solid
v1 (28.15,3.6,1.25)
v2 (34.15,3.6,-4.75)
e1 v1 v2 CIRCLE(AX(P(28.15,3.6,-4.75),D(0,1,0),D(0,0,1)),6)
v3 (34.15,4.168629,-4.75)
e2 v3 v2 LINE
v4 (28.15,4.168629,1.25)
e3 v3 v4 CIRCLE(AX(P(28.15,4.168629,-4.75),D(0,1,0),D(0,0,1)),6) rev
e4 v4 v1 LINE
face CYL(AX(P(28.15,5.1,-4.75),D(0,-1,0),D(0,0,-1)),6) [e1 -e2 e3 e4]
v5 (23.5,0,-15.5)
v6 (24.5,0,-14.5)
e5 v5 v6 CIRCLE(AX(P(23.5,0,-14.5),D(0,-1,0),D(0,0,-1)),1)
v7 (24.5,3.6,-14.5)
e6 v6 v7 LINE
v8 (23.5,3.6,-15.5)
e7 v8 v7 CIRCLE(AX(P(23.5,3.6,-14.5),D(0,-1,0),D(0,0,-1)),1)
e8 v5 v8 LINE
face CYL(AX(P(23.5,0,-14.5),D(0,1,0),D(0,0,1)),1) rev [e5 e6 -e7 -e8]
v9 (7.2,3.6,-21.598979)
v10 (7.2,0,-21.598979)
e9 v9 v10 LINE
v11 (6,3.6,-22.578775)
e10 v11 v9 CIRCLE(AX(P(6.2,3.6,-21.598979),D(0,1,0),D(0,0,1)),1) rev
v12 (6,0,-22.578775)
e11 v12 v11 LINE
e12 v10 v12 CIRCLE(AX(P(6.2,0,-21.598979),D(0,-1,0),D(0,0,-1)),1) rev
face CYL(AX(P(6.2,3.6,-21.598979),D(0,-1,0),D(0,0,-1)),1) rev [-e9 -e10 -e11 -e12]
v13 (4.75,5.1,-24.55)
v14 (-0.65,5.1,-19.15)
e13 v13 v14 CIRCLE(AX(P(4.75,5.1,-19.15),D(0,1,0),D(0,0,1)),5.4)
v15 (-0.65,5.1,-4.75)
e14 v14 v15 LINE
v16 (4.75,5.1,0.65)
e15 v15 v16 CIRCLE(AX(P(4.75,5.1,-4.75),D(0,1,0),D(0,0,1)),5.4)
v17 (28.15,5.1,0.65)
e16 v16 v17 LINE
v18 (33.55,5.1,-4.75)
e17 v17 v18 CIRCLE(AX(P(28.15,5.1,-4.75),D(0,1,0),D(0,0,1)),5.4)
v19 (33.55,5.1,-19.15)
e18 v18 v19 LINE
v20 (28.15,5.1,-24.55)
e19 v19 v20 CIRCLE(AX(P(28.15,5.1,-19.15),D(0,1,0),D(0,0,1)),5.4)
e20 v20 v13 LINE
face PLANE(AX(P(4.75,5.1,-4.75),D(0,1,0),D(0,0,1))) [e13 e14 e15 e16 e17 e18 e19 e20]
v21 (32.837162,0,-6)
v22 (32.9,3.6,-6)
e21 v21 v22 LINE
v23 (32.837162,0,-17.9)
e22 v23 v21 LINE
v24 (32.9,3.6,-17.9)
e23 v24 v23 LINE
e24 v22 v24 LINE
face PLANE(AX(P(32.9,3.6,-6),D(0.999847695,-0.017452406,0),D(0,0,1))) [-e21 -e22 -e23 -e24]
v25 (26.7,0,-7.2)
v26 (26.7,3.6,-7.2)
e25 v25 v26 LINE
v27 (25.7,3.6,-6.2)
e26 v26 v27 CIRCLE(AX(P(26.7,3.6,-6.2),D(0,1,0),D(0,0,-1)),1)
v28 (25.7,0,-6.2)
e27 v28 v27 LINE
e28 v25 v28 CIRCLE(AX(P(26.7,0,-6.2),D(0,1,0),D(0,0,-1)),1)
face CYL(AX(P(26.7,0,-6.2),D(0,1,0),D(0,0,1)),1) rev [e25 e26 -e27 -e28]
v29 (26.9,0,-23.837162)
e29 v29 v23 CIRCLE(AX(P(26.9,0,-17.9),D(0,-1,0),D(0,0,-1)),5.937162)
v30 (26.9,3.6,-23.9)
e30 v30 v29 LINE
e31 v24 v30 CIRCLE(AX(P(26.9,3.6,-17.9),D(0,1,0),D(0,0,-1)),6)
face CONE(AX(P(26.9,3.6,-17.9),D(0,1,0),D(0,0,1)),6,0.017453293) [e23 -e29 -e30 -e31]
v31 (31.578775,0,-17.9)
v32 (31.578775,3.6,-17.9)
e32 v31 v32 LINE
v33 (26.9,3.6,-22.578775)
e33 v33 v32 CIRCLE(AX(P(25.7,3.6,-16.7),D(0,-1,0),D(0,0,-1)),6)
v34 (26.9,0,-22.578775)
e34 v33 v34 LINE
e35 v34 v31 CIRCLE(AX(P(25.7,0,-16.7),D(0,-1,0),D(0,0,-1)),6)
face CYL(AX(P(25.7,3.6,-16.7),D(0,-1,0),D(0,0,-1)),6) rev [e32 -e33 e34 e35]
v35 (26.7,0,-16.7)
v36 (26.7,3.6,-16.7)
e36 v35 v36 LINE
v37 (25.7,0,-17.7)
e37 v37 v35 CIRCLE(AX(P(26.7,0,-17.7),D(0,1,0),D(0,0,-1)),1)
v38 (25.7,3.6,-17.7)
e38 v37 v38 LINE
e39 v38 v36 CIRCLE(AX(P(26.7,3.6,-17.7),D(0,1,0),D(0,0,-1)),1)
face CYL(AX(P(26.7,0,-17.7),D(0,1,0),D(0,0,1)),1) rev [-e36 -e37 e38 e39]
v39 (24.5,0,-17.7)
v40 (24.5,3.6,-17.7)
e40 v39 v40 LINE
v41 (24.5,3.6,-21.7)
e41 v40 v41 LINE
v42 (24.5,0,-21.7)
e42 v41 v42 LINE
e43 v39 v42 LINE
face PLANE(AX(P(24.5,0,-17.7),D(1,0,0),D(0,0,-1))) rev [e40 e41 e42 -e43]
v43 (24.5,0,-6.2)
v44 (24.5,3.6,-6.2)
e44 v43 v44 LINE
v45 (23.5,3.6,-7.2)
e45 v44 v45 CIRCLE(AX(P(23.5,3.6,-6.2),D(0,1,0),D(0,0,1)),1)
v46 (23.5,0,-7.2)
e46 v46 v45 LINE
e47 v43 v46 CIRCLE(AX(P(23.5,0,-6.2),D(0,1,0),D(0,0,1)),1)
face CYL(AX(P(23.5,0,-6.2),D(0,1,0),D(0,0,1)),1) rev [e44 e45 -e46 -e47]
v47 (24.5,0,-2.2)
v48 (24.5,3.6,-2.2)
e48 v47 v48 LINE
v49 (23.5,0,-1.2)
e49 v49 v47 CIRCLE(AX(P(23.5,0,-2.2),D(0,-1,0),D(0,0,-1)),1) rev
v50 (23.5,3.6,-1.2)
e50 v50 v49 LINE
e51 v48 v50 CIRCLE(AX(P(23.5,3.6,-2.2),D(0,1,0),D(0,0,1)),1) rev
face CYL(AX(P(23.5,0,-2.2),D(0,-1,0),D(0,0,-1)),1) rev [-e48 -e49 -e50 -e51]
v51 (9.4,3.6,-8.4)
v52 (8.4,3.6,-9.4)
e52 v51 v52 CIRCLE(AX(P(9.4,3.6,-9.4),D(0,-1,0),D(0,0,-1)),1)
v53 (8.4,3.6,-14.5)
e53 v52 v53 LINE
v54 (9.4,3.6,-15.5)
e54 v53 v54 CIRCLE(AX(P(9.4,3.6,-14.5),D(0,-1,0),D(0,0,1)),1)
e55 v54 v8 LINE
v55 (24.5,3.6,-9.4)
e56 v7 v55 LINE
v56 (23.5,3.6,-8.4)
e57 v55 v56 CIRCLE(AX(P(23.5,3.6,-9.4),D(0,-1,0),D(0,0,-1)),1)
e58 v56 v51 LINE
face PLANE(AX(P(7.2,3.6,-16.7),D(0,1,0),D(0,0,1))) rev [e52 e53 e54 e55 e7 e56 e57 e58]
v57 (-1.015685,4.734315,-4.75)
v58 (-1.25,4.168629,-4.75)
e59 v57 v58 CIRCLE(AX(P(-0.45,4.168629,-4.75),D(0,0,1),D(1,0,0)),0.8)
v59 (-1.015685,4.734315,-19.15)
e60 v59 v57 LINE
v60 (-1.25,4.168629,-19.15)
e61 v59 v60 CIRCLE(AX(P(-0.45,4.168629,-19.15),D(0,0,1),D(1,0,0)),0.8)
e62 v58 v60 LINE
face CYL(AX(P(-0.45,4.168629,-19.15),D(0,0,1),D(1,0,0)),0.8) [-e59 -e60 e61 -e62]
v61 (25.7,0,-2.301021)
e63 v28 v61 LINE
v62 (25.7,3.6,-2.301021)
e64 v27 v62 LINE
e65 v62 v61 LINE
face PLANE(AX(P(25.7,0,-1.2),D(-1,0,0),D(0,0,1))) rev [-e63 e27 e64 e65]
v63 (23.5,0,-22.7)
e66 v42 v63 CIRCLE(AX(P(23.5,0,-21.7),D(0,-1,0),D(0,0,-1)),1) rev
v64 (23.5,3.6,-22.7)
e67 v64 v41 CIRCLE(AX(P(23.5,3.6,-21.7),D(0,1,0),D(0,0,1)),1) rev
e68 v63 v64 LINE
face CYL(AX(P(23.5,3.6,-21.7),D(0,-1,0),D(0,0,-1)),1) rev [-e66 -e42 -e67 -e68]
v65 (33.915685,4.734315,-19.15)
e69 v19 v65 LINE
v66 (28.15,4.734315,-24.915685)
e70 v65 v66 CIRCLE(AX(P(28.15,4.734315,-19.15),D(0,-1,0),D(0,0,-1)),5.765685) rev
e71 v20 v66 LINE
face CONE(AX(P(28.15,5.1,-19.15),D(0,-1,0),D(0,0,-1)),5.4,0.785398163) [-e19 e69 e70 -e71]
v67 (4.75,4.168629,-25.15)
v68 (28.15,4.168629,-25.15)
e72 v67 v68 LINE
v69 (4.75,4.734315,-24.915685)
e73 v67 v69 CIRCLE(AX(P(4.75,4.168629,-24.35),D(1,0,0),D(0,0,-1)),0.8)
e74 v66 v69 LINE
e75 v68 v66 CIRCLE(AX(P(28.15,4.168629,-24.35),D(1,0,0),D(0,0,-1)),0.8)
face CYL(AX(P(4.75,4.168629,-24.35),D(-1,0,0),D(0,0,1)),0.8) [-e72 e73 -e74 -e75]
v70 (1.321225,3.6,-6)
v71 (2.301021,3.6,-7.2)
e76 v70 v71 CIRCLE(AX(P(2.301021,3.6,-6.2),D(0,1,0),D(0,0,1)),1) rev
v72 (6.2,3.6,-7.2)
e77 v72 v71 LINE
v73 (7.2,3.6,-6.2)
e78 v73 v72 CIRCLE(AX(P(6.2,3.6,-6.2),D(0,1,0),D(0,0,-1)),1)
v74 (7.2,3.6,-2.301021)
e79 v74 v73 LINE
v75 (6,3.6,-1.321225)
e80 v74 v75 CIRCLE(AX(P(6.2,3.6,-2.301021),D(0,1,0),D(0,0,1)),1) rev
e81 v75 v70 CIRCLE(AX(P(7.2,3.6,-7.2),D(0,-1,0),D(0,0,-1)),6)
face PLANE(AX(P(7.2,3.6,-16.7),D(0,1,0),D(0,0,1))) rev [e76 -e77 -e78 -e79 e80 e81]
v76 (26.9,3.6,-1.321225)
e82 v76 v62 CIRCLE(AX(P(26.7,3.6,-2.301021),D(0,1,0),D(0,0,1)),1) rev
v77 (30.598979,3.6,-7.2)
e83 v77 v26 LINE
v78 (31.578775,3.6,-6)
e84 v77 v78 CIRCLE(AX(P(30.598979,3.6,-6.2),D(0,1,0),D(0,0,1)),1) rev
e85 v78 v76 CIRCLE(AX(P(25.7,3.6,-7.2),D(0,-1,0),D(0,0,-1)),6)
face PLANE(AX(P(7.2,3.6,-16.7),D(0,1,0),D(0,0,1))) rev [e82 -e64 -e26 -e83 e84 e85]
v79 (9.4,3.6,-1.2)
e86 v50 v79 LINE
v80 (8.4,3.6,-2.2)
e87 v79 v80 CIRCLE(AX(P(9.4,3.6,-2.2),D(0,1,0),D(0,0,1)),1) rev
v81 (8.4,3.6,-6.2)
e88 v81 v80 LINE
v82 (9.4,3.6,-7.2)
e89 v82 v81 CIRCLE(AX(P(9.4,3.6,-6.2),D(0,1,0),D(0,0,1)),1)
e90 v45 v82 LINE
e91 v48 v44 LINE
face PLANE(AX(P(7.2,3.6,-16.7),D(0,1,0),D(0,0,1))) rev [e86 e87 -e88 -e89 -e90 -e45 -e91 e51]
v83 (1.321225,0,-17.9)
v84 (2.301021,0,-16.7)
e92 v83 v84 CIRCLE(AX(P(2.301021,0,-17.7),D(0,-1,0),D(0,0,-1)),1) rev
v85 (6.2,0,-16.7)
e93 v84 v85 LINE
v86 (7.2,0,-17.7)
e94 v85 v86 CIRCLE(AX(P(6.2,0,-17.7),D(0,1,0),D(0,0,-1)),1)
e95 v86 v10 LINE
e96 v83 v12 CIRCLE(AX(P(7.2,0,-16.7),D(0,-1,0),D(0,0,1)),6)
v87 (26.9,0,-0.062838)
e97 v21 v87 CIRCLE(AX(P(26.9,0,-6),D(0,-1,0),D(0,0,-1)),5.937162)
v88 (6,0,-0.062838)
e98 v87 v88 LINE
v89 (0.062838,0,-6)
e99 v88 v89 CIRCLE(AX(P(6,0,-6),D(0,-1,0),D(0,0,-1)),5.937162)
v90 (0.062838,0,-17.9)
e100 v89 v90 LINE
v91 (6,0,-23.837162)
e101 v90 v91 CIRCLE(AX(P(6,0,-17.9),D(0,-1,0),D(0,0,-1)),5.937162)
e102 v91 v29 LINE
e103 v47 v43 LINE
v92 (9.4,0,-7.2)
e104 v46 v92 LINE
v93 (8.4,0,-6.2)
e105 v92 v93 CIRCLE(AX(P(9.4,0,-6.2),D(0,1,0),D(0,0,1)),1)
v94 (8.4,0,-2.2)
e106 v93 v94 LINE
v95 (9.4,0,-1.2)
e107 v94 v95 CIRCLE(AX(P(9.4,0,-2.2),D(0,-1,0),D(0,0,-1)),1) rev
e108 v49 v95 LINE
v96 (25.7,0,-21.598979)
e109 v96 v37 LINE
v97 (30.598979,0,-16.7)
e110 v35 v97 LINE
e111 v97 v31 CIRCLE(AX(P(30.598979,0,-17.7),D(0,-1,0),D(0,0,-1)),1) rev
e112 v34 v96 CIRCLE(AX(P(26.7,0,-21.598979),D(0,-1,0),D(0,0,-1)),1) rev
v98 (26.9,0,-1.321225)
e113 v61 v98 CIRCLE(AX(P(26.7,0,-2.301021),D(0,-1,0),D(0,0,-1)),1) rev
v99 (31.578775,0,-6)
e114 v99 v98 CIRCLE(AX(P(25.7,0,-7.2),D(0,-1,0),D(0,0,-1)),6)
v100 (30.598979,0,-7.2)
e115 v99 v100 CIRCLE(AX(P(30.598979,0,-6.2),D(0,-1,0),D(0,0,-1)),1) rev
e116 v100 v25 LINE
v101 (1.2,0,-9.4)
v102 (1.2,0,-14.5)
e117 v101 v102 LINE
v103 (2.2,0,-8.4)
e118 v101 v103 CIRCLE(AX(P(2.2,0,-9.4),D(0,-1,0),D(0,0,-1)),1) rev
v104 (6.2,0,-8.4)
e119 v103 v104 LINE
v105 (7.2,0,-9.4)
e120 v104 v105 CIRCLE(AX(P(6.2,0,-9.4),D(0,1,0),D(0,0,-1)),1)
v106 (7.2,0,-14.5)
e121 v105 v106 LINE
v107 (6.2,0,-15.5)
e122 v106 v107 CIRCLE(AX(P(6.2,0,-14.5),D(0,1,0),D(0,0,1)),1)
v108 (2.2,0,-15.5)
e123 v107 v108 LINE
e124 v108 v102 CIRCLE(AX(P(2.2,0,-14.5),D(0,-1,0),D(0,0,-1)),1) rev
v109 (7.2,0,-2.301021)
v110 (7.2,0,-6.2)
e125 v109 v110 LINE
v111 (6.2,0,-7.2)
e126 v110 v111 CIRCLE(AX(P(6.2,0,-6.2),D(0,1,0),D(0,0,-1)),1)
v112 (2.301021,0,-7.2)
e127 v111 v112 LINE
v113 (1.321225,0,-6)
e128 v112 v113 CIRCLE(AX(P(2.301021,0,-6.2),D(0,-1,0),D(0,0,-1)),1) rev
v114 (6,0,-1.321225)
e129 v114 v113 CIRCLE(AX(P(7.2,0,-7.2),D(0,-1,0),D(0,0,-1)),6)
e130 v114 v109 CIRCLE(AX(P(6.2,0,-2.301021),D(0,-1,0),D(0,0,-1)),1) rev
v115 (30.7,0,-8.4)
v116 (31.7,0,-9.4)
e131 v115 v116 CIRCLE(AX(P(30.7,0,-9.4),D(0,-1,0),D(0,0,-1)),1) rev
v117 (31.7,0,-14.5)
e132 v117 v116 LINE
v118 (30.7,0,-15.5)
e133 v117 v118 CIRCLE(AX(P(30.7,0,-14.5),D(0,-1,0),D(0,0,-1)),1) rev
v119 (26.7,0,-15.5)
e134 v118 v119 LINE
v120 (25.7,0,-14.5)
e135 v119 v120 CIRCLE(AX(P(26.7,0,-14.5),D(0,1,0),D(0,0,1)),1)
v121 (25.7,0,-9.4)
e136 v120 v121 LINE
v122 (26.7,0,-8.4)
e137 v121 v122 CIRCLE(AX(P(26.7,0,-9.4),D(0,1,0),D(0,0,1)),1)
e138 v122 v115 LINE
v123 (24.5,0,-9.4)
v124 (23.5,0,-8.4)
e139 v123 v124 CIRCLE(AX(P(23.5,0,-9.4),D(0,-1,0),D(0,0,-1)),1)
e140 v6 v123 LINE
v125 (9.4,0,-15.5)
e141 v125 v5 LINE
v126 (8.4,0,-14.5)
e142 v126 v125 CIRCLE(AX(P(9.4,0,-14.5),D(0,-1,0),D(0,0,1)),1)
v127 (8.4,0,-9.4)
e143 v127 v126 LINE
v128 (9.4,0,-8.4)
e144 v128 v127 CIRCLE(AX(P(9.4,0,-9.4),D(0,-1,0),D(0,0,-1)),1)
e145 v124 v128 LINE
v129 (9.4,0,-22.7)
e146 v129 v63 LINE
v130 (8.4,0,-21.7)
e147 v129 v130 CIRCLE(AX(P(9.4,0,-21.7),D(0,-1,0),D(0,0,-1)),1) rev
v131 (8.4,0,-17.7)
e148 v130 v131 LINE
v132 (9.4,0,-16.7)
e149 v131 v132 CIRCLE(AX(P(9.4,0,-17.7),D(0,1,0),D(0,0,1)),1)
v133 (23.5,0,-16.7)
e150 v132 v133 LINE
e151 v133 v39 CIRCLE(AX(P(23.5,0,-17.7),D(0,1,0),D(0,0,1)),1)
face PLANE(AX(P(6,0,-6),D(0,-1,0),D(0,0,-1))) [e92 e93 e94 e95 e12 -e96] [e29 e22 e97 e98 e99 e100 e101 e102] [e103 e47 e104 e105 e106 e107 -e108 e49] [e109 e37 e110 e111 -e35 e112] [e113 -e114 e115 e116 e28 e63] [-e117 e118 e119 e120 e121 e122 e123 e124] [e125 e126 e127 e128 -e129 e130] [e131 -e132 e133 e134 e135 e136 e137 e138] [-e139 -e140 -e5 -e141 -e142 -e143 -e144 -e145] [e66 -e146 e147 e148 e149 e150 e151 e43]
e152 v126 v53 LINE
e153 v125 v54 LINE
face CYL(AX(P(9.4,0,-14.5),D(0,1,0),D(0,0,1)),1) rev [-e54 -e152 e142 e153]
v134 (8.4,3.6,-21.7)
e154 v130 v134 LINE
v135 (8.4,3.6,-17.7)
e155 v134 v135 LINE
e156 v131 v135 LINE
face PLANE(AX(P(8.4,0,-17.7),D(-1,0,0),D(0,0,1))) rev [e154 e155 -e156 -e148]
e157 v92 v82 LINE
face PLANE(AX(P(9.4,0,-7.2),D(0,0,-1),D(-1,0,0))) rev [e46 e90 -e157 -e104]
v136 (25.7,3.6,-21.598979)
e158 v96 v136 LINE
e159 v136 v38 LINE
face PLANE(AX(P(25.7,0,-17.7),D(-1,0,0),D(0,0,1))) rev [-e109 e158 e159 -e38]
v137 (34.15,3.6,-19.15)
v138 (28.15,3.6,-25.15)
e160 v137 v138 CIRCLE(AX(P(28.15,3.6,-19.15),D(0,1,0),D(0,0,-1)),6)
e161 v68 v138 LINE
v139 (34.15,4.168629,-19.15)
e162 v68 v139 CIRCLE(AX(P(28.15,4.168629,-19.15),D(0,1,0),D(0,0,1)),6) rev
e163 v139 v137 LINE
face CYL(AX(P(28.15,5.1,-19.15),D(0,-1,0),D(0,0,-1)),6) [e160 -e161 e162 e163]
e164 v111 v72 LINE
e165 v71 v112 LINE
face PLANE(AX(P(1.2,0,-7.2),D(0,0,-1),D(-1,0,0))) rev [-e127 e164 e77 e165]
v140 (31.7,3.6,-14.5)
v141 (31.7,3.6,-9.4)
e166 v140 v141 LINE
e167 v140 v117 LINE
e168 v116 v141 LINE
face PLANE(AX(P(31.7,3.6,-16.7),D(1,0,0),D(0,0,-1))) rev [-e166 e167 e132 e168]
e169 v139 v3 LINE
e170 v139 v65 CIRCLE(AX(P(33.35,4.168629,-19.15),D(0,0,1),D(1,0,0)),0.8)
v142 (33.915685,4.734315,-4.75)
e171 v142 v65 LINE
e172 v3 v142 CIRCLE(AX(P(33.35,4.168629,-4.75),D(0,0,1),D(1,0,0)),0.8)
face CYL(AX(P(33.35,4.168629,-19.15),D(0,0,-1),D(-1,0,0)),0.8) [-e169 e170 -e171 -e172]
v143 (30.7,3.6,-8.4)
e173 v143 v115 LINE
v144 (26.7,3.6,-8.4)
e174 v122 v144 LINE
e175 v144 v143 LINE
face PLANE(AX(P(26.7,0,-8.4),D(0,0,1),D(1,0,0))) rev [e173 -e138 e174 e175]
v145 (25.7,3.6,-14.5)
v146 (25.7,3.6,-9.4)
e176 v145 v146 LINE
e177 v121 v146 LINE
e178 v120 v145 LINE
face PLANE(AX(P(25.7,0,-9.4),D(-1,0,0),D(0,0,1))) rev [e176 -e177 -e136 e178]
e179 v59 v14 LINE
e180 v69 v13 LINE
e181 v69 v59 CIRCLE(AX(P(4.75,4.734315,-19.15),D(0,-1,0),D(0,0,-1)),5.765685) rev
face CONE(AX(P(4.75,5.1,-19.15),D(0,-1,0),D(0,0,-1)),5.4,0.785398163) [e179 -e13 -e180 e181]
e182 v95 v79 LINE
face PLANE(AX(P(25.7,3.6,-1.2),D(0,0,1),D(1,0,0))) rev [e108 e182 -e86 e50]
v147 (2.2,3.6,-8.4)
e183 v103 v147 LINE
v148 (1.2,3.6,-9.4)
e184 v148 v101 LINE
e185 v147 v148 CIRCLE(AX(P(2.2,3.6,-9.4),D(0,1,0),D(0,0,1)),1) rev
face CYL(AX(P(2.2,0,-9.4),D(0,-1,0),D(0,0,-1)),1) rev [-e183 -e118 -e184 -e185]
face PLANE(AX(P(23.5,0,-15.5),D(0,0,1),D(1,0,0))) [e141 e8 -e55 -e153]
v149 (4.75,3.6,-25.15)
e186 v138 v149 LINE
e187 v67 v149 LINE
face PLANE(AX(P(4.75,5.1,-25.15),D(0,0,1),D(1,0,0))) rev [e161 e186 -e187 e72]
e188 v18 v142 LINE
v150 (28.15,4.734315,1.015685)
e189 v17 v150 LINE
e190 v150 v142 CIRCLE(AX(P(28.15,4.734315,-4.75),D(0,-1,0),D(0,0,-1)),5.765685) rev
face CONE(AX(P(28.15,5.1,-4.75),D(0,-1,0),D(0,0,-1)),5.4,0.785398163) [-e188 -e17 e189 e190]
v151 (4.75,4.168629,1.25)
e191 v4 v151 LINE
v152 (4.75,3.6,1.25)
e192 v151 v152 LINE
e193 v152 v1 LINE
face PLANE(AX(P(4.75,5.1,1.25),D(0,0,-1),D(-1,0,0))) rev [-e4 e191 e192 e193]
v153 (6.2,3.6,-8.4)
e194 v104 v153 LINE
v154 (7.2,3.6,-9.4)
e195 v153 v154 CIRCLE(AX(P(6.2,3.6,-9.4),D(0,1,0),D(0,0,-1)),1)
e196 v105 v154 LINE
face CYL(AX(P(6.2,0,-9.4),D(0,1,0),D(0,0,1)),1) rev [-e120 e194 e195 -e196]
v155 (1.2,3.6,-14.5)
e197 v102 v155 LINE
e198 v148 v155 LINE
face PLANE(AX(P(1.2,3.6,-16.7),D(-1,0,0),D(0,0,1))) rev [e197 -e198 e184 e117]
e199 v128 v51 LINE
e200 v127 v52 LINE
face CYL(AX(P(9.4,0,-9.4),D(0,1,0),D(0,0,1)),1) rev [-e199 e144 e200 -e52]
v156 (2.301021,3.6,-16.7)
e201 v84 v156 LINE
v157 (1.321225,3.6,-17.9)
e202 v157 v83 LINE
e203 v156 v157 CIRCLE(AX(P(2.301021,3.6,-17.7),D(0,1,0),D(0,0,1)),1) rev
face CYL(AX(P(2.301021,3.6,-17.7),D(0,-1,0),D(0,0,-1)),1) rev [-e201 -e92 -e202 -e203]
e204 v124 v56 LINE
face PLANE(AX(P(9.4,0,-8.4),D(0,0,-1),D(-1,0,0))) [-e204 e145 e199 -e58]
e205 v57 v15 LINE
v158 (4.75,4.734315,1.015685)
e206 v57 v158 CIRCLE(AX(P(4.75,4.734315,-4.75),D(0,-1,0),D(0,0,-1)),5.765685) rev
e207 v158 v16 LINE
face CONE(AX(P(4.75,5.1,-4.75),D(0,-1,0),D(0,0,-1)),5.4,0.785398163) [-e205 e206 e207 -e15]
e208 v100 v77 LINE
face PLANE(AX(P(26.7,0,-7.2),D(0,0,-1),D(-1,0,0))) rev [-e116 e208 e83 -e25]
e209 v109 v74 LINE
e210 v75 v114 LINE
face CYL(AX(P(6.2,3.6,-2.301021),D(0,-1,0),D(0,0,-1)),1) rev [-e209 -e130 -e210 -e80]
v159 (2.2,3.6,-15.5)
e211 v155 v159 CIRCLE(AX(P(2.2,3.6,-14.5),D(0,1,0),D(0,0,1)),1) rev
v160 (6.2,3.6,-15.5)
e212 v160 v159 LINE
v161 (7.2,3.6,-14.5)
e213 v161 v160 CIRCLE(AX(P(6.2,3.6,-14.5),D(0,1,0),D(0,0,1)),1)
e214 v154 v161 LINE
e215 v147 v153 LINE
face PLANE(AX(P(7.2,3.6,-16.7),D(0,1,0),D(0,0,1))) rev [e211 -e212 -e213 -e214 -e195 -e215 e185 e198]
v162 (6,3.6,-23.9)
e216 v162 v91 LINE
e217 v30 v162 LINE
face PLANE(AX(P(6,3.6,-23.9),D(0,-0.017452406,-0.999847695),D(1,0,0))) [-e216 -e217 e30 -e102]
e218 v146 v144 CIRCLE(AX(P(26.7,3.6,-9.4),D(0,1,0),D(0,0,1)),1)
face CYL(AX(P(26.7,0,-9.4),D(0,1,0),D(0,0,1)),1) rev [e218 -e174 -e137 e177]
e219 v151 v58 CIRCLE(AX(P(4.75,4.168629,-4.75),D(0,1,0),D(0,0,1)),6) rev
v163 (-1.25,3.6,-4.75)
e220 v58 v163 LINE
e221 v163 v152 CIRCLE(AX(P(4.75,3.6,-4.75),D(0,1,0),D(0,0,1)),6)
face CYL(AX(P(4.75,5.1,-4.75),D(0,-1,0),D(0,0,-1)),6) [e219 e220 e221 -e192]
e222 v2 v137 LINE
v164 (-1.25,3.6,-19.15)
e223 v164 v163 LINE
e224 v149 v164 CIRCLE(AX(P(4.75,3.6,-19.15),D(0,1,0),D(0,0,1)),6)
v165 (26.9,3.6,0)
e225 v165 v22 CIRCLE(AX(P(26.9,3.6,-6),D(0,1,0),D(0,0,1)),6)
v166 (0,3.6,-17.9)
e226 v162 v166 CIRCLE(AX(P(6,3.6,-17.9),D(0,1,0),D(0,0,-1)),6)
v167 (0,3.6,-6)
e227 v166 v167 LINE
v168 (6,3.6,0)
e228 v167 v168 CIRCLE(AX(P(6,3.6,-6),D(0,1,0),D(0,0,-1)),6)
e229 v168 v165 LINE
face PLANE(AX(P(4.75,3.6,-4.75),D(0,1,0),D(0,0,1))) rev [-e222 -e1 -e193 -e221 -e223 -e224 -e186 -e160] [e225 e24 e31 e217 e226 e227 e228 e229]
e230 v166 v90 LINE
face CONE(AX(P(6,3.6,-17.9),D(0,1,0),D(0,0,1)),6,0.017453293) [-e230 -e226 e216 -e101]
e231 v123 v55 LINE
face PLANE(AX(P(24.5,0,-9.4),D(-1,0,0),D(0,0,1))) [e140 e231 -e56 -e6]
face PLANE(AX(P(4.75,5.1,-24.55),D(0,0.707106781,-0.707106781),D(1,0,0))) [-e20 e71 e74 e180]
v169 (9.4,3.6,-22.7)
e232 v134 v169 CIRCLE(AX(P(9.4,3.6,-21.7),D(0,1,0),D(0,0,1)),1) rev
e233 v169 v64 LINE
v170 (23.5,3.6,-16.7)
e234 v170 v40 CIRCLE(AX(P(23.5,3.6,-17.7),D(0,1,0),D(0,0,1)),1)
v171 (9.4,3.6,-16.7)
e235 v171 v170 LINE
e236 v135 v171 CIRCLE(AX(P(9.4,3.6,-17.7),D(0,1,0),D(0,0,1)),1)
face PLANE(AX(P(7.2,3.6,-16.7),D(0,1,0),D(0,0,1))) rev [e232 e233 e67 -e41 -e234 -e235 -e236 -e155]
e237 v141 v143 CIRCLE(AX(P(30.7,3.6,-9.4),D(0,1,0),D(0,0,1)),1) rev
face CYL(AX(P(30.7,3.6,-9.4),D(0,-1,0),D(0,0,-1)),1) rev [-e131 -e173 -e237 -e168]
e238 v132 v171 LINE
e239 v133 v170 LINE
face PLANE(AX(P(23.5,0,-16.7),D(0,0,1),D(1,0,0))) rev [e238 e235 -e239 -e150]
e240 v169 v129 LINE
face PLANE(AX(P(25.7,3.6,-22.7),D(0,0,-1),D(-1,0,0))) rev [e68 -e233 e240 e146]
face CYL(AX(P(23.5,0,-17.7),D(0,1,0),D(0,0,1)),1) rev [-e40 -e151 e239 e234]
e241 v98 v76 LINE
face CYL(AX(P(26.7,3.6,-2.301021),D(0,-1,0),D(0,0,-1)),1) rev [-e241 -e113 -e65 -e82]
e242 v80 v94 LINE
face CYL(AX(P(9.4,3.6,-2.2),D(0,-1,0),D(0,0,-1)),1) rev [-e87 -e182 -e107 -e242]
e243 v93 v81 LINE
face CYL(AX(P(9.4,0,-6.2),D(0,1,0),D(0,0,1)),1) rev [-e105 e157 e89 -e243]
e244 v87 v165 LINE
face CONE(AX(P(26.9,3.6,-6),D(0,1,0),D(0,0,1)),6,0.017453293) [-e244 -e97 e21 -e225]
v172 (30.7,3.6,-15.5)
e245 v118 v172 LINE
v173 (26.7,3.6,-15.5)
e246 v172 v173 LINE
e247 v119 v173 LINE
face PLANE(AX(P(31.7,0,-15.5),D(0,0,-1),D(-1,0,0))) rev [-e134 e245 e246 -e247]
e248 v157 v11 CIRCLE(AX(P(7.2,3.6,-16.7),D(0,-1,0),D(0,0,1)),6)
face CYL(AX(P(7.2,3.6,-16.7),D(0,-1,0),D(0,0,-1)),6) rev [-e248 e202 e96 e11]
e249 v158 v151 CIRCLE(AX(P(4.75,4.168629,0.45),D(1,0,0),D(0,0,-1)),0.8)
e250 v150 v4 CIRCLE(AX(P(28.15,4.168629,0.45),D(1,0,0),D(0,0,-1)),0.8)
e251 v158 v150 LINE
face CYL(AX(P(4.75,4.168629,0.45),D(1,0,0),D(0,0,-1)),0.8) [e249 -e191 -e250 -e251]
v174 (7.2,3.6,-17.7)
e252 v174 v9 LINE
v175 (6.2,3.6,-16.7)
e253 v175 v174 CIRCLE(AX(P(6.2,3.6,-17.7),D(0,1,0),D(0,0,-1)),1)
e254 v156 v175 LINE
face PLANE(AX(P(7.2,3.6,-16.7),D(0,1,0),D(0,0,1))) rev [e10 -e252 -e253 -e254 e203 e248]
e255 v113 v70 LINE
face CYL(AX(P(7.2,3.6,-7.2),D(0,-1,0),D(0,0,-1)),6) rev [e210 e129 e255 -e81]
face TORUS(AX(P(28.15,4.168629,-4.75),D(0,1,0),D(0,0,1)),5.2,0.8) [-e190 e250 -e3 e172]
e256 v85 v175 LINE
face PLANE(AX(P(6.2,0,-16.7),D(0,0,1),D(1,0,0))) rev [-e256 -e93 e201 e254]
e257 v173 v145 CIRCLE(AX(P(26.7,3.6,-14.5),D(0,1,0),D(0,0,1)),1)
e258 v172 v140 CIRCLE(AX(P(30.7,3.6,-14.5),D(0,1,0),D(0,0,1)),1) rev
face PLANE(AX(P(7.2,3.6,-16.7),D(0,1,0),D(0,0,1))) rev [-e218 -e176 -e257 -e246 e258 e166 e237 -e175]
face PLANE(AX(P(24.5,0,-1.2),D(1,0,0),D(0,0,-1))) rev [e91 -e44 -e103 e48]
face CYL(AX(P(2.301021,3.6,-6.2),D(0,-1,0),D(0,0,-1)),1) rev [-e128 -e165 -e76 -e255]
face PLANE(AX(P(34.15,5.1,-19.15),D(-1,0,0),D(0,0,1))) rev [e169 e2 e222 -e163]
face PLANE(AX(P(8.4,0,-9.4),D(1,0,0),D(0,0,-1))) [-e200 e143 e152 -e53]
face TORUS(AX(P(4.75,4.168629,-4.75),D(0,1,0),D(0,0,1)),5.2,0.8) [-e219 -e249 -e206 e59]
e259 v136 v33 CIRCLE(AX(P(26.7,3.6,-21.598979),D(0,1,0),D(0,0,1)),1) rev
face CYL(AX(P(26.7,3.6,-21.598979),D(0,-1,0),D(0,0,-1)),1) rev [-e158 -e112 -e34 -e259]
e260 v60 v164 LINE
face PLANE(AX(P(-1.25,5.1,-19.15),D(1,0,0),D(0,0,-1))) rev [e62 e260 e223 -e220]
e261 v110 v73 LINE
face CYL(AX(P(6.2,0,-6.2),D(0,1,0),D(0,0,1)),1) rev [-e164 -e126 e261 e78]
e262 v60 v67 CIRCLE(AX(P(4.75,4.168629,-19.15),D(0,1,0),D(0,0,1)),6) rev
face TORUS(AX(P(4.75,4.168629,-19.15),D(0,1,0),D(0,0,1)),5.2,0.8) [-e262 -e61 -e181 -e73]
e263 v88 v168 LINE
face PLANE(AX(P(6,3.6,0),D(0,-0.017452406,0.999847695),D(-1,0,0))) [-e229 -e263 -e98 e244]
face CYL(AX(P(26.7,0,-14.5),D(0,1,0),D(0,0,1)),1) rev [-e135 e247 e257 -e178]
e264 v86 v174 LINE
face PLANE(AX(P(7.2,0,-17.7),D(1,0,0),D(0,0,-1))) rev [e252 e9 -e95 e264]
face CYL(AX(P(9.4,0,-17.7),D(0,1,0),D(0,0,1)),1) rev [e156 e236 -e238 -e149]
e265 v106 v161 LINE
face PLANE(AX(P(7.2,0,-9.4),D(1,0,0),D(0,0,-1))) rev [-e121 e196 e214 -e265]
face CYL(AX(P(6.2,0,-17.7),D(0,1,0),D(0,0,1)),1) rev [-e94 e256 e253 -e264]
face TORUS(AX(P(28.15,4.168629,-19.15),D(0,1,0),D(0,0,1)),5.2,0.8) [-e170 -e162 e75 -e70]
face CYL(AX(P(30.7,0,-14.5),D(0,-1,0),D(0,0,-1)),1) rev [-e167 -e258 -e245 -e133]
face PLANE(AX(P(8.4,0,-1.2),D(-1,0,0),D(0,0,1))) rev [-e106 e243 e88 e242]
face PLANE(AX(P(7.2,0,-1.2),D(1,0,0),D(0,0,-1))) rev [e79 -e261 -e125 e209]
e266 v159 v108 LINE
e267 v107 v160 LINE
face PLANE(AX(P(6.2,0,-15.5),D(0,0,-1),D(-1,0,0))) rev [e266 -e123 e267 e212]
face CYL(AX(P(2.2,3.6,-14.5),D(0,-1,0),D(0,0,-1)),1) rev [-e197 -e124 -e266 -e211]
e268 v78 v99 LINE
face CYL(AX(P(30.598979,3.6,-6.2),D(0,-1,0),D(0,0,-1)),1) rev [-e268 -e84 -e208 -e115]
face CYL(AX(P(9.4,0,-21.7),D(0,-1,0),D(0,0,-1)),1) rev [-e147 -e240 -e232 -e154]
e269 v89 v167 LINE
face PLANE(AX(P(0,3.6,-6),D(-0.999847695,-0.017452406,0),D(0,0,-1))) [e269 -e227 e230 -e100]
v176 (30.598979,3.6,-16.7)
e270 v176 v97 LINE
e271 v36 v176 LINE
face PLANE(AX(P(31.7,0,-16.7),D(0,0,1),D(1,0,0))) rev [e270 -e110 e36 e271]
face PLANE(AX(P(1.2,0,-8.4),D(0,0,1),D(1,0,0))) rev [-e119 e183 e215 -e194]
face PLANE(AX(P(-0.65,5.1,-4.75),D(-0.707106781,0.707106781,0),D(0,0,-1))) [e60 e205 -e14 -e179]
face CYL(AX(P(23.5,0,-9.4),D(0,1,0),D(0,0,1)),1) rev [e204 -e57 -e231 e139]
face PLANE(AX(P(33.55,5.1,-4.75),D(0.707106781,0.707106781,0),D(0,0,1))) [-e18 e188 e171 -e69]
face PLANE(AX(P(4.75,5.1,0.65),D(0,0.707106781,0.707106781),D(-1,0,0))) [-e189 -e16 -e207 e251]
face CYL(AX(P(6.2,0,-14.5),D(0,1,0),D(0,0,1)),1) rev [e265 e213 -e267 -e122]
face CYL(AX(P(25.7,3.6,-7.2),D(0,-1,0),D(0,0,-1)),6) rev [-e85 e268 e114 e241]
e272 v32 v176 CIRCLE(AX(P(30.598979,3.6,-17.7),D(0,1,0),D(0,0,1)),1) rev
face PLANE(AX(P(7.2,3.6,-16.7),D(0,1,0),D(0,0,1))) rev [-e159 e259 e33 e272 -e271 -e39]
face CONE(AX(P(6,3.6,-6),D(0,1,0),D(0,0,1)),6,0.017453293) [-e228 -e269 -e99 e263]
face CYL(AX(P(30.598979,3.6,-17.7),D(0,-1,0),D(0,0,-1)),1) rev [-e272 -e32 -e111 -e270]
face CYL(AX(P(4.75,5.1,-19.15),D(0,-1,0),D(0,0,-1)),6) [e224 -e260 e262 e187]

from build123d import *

# Parameters (mm, degrees)
BOSS_EXTRUDE1_DEPTH = 3.6
BOSS_EXTRUDE2_DEPTH = 1.5
CUT_EXTRUDE1_DEPTH  = 3.6
BOSS_EXTRUDE5_DEPTH = 3.6
CHAMFER1_SIZE       = 3.6
CHAMFER1_SIZE_2     = 0.062838234
FILLET3_R           = 1
CHAMFER2_SIZE       = 0.6
FILLET4_R           = 0.8


with BuildPart() as part:
    # Sketch1 → Boss-Extrude1 (new body)
    with BuildSketch(Plane(origin=(0, 0, 0), x_dir=(1, 0, 0), z_dir=(0, 1, 0))):
        with BuildLine():
            Line((6, 0), (26.9, 0))
            ThreePointArc((26.9, 0), (31.142640687, 1.757359313), (32.9, 6))
            Line((32.9, 6), (32.9, 17.9))
            ThreePointArc((32.9, 17.9), (31.142640687, 22.142640687), (26.9, 23.9))
            Line((26.9, 23.9), (6, 23.9))
            ThreePointArc((6, 23.9), (1.757359313, 22.142640687), (0, 17.9))
            Line((0, 17.9), (0, 6))
            ThreePointArc((0, 6), (1.757359313, 1.757359313), (6, 0))
        make_face()
    extrude(amount=BOSS_EXTRUDE1_DEPTH)

    # Sketch2 → Boss-Extrude2 (add)
    with BuildSketch(Plane(origin=(0, 3.6, 0), x_dir=(1, 0, 0), z_dir=(0, 1, 0))):
        with BuildLine():
            Line((4.75, 25.15), (28.15, 25.15))
            ThreePointArc((28.15, 25.15), (32.392640687, 23.392640687), (34.15, 19.15))
            Line((34.15, 19.15), (34.15, 4.75))
            ThreePointArc((34.15, 4.75), (32.392640687, 0.507359313), (28.15, -1.25))
            Line((28.15, -1.25), (4.75, -1.25))
            ThreePointArc((4.75, -1.25), (0.507359313, 0.507359313), (-1.25, 4.75))
            Line((-1.25, 4.75), (-1.25, 19.15))
            ThreePointArc((-1.25, 19.15), (0.507359313, 23.392640687), (4.75, 25.15))
        make_face()
    extrude(amount=BOSS_EXTRUDE2_DEPTH)

    # Sketch3 → Cut-Extrude1 (cut)
    with BuildSketch(Plane.XZ):
        with BuildLine():
            Line((25.7, -22.7), (7.2, -22.7))
            ThreePointArc((7.2, -22.7), (2.957359313, -20.942640687), (1.2, -16.7))
            Line((1.2, -16.7), (1.2, -7.2))
            ThreePointArc((1.2, -7.2), (2.957359313, -2.957359313), (7.2, -1.2))
            Line((7.2, -1.2), (25.7, -1.2))
            ThreePointArc((25.7, -1.2), (29.942640687, -2.957359313), (31.7, -7.2))
            Line((31.7, -7.2), (31.7, -16.7))
            ThreePointArc((31.7, -16.7), (29.942640687, -20.942640687), (25.7, -22.7))
        make_face()
    extrude(amount=-CUT_EXTRUDE1_DEPTH, mode=Mode.SUBTRACT)

    # Sketch5 → Boss-Extrude5 (add)
    with BuildSketch(Plane.XZ.offset(-3.6)):
        with BuildLine():
            Line((7.2, -1.2), (8.4, -1.2))
            Line((8.4, -1.2), (8.4, -6.2))
            ThreePointArc((8.4, -6.2), (8.692893219, -6.907106781), (9.4, -7.2))
            Line((9.4, -7.2), (23.5, -7.2))
            ThreePointArc((23.5, -7.2), (24.207106781, -6.907106781), (24.5, -6.2))
            Line((24.5, -6.2), (24.5, -1.2))
            Line((24.5, -1.2), (25.7, -1.2))
            Line((25.7, -1.2), (25.7, -6.2))
            ThreePointArc((25.7, -6.2), (25.992893219, -6.907106781), (26.7, -7.2))
            Line((26.7, -7.2), (31.7, -7.2))
            Line((31.7, -7.2), (31.7, -8.4))
            Line((31.7, -8.4), (26.7, -8.4))
            ThreePointArc((26.7, -8.4), (25.992893219, -8.692893219), (25.7, -9.4))
            Line((25.7, -9.4), (25.7, -14.5))
            ThreePointArc((25.7, -14.5), (25.992893219, -15.207106781), (26.7, -15.5))
            Line((26.7, -15.5), (31.7, -15.5))
            Line((31.7, -15.5), (31.7, -16.7))
            Line((31.7, -16.7), (26.7, -16.7))
            ThreePointArc((26.7, -16.7), (25.992893219, -16.992893219), (25.7, -17.7))
            Line((25.7, -17.7), (25.7, -22.7))
            Line((25.7, -22.7), (24.5, -22.7))
            Line((24.5, -22.7), (24.5, -17.7))
            ThreePointArc((24.5, -17.7), (24.207106781, -16.992893219), (23.5, -16.7))
            Line((23.5, -16.7), (9.4, -16.7))
            ThreePointArc((9.4, -16.7), (8.692893219, -16.992893219), (8.4, -17.7))
            Line((8.4, -17.7), (8.4, -22.7))
            Line((8.4, -22.7), (7.2, -22.7))
            Line((7.2, -22.7), (7.2, -17.7))
            ThreePointArc((7.2, -17.7), (6.907106781, -16.992893219), (6.2, -16.7))
            Line((6.2, -16.7), (1.2, -16.7))
            Line((1.2, -16.7), (1.2, -15.5))
            Line((1.2, -15.5), (6.2, -15.5))
            ThreePointArc((6.2, -15.5), (6.907106781, -15.207106781), (7.2, -14.5))
            Line((7.2, -14.5), (7.2, -9.4))
            ThreePointArc((7.2, -9.4), (6.907106781, -8.692893219), (6.2, -8.4))
            Line((6.2, -8.4), (1.2, -8.4))
            Line((1.2, -8.4), (1.2, -7.2))
            Line((1.2, -7.2), (6.2, -7.2))
            ThreePointArc((6.2, -7.2), (6.907106781, -6.907106781), (7.2, -6.2))
            Line((7.2, -6.2), (7.2, -1.2))
        make_face()
        with BuildLine():
            Line((9.4, -8.4), (23.5, -8.4))
            ThreePointArc((23.5, -8.4), (24.207106781, -8.692893219), (24.5, -9.4))
            Line((24.5, -9.4), (24.5, -14.5))
            ThreePointArc((24.5, -14.5), (24.207106781, -15.207106781), (23.5, -15.5))
            Line((23.5, -15.5), (9.4, -15.5))
            ThreePointArc((9.4, -15.5), (8.692893219, -15.207106781), (8.4, -14.5))
            Line((8.4, -14.5), (8.4, -9.4))
            ThreePointArc((8.4, -9.4), (8.692893219, -8.692893219), (9.4, -8.4))
        make_face(mode=Mode.SUBTRACT)
    extrude(amount=BOSS_EXTRUDE5_DEPTH)

    # Chamfer1
    # the kernel refuses this chamfer: 3.6, 0.062838234 mm, written as the material it takes off along each edge
    with BuildSketch(Plane(origin=(0, 0, -17.9), x_dir=(-0.0006712501823120534, 0.9999997747115711, 0), z_dir=(0, 0, 1))) as chamfer1_piece_1_section:
        Polygon((CHAMFER1_SIZE * 0.999999774712, -CHAMFER1_SIZE * 0.000671250182312), (-CHAMFER1_SIZE_2 * 0.000671250179552, -CHAMFER1_SIZE_2 * 0.999999770599), (0, 0), align=None)
    chamfer1_piece_1 = extrude(amount=11.9, mode=Mode.PRIVATE)
    chamfer1_piece_1 = split(chamfer1_piece_1, bisect_by=Plane(origin=(-0.01902042, 3.6, -11.95), z_dir=(0, -1, 0)), keep=Keep.TOP, mode=Mode.PRIVATE)
    add(chamfer1_piece_1, mode=Mode.SUBTRACT)
    with BuildSketch(Plane(origin=(6, 0, -6), x_dir=(-1, 0, 0), z_dir=(0, 0, -1))) as chamfer1_piece_2_section:
        Polygon((6, CHAMFER1_SIZE), (6 - CHAMFER1_SIZE_2 * 0.999999995888, 0), (6, 0), align=None)
    chamfer1_piece_2 = revolve(axis=Axis((6, 0, -6), (0, 1, 0)), revolution_arc=90, mode=Mode.PRIVATE)
    chamfer1_piece_2 = split(chamfer1_piece_2, bisect_by=Plane(origin=(1.769655981, 3.6, -1.769655981), z_dir=(0, -1, 0)), keep=Keep.TOP, mode=Mode.PRIVATE)
    add(chamfer1_piece_2, mode=Mode.SUBTRACT)
    with BuildSketch(Plane(origin=(6, 0, -17.9), x_dir=(0, 0, -1), z_dir=(1, 0, 0))) as chamfer1_piece_3_section:
        Polygon((6, CHAMFER1_SIZE), (6 - CHAMFER1_SIZE_2 * 0.999999995888, 0), (6, 0), align=None)
    chamfer1_piece_3 = revolve(axis=Axis((6, 0, -17.9), (0, 1, 0)), revolution_arc=90, mode=Mode.PRIVATE)
    chamfer1_piece_3 = split(chamfer1_piece_3, bisect_by=Plane(origin=(1.769655981, 3.6, -22.130344019), z_dir=(0, -1, 0)), keep=Keep.TOP, mode=Mode.PRIVATE)
    add(chamfer1_piece_3, mode=Mode.SUBTRACT)
    with BuildSketch(Plane(origin=(6, 0, 0), x_dir=(0, 0.9999997747115711, 0.0006712501823120534), z_dir=(1, 0, 0))) as chamfer1_piece_4_section:
        Polygon((CHAMFER1_SIZE * 0.999999774712, -CHAMFER1_SIZE * 0.000671250182312), (-CHAMFER1_SIZE_2 * 0.000671250179552, -CHAMFER1_SIZE_2 * 0.999999770599), (0, 0), align=None)
    chamfer1_piece_4 = extrude(amount=20.9, mode=Mode.PRIVATE)
    chamfer1_piece_4 = split(chamfer1_piece_4, bisect_by=Plane(origin=(16.45, 3.6, 0.01902042), z_dir=(0, -1, 0)), keep=Keep.TOP, mode=Mode.PRIVATE)
    add(chamfer1_piece_4, mode=Mode.SUBTRACT)
    with BuildSketch(Plane(origin=(26.9, 0, -23.9), x_dir=(0, 0.9999997747115711, -0.0006712501823119971), z_dir=(-1, 0, 0))) as chamfer1_piece_5_section:
        Polygon((CHAMFER1_SIZE * 0.999999774712, -CHAMFER1_SIZE * 0.000671250182312), (-CHAMFER1_SIZE_2 * 0.000671250179552, -CHAMFER1_SIZE_2 * 0.999999770599), (0, 0), align=None)
    chamfer1_piece_5 = extrude(amount=20.9, mode=Mode.PRIVATE)
    chamfer1_piece_5 = split(chamfer1_piece_5, bisect_by=Plane(origin=(16.45, 3.6, -23.91902042), z_dir=(0, -1, 0)), keep=Keep.TOP, mode=Mode.PRIVATE)
    add(chamfer1_piece_5, mode=Mode.SUBTRACT)
    with BuildSketch(Plane(origin=(26.9, 0, -6), x_dir=(0, 0, 1), z_dir=(-1, 0, 0))) as chamfer1_piece_6_section:
        Polygon((6, CHAMFER1_SIZE), (6 - CHAMFER1_SIZE_2 * 0.999999995888, 0), (6, 0), align=None)
    chamfer1_piece_6 = revolve(axis=Axis((26.9, 0, -6), (0, 1, 0)), revolution_arc=90, mode=Mode.PRIVATE)
    chamfer1_piece_6 = split(chamfer1_piece_6, bisect_by=Plane(origin=(31.130344019, 3.6, -1.769655981), z_dir=(0, -1, 0)), keep=Keep.TOP, mode=Mode.PRIVATE)
    add(chamfer1_piece_6, mode=Mode.SUBTRACT)
    with BuildSketch(Plane(origin=(26.9, 0, -17.9), x_dir=(1, 0, 0), z_dir=(0, 0, 1))) as chamfer1_piece_7_section:
        Polygon((6, CHAMFER1_SIZE), (6 - CHAMFER1_SIZE_2 * 0.999999995888, 0), (6, 0), align=None)
    chamfer1_piece_7 = revolve(axis=Axis((26.9, 0, -17.9), (0, 1, 0)), revolution_arc=90, mode=Mode.PRIVATE)
    chamfer1_piece_7 = split(chamfer1_piece_7, bisect_by=Plane(origin=(31.130344019, 3.6, -22.130344019), z_dir=(0, -1, 0)), keep=Keep.TOP, mode=Mode.PRIVATE)
    add(chamfer1_piece_7, mode=Mode.SUBTRACT)
    with BuildSketch(Plane(origin=(32.9, 0, -6), x_dir=(0.000671250182312946, 0.9999997747115711, 0), z_dir=(0, 0, -1))) as chamfer1_piece_8_section:
        Polygon((CHAMFER1_SIZE * 0.999999774712, -CHAMFER1_SIZE * 0.000671250182313), (-CHAMFER1_SIZE_2 * 0.000671250179553, -CHAMFER1_SIZE_2 * 0.999999770599), (0, 0), align=None)
    chamfer1_piece_8 = extrude(amount=11.9, mode=Mode.PRIVATE)
    chamfer1_piece_8 = split(chamfer1_piece_8, bisect_by=Plane(origin=(32.91902042, 3.6, -11.95), z_dir=(0, -1, 0)), keep=Keep.TOP, mode=Mode.PRIVATE)
    add(chamfer1_piece_8, mode=Mode.SUBTRACT)

    # Fillet3
    fillet3_edges = [part.edges().sort_by_distance(p)[0] for p in [
        (1.2, 1.8, -8.4),
        (1.2, 1.8, -15.5),
        (8.4, 1.8, -22.7),
        (24.5, 1.8, -22.7),
        (31.7, 1.8, -15.5),
        (31.7, 1.8, -8.4),
        (24.5, 1.8, -1.2),
        (8.4, 1.8, -1.2),
        (7.2, 1.8, -22.7),
        (1.2, 1.8, -16.7),
        (1.2, 1.8, -7.2),
        (7.2, 1.8, -1.2),
        (25.7, 1.8, -1.2),
        (31.7, 1.8, -7.2),
        (31.7, 1.8, -16.7),
        (25.7, 1.8, -22.7),
    ]]
    fillet(fillet3_edges, radius=FILLET3_R)

    # Chamfer2
    chamfer2_edges = [part.edges().sort_by_distance(p)[0] for p in [
        (0.507359313, 5.1, -0.507359313),
        (16.45, 5.1, 1.25),
        (32.392640687, 5.1, -0.507359313),
        (34.15, 5.1, -11.95),
        (32.392640687, 5.1, -23.392640687),
        (16.45, 5.1, -25.15),
        (0.507359313, 5.1, -23.392640687),
        (-1.25, 5.1, -11.95),
    ]]
    chamfer(chamfer2_edges, length=CHAMFER2_SIZE)

    # Fillet4
    fillet4_edges = [part.edges().sort_by_distance(p)[0] for p in [
        (16.45, 4.5, -25.15),
        (0.507359313, 4.5, -23.392640687),
        (32.392640687, 4.5, -23.392640687),
        (-1.25, 4.5, -11.95),
        (34.15, 4.5, -11.95),
        (0.507359313, 4.5, -0.507359313),
        (32.392640687, 4.5, -0.507359313),
        (16.45, 4.5, 1.25),
    ]]
    fillet(fillet4_edges, radius=FILLET4_R)


solid = part.part
